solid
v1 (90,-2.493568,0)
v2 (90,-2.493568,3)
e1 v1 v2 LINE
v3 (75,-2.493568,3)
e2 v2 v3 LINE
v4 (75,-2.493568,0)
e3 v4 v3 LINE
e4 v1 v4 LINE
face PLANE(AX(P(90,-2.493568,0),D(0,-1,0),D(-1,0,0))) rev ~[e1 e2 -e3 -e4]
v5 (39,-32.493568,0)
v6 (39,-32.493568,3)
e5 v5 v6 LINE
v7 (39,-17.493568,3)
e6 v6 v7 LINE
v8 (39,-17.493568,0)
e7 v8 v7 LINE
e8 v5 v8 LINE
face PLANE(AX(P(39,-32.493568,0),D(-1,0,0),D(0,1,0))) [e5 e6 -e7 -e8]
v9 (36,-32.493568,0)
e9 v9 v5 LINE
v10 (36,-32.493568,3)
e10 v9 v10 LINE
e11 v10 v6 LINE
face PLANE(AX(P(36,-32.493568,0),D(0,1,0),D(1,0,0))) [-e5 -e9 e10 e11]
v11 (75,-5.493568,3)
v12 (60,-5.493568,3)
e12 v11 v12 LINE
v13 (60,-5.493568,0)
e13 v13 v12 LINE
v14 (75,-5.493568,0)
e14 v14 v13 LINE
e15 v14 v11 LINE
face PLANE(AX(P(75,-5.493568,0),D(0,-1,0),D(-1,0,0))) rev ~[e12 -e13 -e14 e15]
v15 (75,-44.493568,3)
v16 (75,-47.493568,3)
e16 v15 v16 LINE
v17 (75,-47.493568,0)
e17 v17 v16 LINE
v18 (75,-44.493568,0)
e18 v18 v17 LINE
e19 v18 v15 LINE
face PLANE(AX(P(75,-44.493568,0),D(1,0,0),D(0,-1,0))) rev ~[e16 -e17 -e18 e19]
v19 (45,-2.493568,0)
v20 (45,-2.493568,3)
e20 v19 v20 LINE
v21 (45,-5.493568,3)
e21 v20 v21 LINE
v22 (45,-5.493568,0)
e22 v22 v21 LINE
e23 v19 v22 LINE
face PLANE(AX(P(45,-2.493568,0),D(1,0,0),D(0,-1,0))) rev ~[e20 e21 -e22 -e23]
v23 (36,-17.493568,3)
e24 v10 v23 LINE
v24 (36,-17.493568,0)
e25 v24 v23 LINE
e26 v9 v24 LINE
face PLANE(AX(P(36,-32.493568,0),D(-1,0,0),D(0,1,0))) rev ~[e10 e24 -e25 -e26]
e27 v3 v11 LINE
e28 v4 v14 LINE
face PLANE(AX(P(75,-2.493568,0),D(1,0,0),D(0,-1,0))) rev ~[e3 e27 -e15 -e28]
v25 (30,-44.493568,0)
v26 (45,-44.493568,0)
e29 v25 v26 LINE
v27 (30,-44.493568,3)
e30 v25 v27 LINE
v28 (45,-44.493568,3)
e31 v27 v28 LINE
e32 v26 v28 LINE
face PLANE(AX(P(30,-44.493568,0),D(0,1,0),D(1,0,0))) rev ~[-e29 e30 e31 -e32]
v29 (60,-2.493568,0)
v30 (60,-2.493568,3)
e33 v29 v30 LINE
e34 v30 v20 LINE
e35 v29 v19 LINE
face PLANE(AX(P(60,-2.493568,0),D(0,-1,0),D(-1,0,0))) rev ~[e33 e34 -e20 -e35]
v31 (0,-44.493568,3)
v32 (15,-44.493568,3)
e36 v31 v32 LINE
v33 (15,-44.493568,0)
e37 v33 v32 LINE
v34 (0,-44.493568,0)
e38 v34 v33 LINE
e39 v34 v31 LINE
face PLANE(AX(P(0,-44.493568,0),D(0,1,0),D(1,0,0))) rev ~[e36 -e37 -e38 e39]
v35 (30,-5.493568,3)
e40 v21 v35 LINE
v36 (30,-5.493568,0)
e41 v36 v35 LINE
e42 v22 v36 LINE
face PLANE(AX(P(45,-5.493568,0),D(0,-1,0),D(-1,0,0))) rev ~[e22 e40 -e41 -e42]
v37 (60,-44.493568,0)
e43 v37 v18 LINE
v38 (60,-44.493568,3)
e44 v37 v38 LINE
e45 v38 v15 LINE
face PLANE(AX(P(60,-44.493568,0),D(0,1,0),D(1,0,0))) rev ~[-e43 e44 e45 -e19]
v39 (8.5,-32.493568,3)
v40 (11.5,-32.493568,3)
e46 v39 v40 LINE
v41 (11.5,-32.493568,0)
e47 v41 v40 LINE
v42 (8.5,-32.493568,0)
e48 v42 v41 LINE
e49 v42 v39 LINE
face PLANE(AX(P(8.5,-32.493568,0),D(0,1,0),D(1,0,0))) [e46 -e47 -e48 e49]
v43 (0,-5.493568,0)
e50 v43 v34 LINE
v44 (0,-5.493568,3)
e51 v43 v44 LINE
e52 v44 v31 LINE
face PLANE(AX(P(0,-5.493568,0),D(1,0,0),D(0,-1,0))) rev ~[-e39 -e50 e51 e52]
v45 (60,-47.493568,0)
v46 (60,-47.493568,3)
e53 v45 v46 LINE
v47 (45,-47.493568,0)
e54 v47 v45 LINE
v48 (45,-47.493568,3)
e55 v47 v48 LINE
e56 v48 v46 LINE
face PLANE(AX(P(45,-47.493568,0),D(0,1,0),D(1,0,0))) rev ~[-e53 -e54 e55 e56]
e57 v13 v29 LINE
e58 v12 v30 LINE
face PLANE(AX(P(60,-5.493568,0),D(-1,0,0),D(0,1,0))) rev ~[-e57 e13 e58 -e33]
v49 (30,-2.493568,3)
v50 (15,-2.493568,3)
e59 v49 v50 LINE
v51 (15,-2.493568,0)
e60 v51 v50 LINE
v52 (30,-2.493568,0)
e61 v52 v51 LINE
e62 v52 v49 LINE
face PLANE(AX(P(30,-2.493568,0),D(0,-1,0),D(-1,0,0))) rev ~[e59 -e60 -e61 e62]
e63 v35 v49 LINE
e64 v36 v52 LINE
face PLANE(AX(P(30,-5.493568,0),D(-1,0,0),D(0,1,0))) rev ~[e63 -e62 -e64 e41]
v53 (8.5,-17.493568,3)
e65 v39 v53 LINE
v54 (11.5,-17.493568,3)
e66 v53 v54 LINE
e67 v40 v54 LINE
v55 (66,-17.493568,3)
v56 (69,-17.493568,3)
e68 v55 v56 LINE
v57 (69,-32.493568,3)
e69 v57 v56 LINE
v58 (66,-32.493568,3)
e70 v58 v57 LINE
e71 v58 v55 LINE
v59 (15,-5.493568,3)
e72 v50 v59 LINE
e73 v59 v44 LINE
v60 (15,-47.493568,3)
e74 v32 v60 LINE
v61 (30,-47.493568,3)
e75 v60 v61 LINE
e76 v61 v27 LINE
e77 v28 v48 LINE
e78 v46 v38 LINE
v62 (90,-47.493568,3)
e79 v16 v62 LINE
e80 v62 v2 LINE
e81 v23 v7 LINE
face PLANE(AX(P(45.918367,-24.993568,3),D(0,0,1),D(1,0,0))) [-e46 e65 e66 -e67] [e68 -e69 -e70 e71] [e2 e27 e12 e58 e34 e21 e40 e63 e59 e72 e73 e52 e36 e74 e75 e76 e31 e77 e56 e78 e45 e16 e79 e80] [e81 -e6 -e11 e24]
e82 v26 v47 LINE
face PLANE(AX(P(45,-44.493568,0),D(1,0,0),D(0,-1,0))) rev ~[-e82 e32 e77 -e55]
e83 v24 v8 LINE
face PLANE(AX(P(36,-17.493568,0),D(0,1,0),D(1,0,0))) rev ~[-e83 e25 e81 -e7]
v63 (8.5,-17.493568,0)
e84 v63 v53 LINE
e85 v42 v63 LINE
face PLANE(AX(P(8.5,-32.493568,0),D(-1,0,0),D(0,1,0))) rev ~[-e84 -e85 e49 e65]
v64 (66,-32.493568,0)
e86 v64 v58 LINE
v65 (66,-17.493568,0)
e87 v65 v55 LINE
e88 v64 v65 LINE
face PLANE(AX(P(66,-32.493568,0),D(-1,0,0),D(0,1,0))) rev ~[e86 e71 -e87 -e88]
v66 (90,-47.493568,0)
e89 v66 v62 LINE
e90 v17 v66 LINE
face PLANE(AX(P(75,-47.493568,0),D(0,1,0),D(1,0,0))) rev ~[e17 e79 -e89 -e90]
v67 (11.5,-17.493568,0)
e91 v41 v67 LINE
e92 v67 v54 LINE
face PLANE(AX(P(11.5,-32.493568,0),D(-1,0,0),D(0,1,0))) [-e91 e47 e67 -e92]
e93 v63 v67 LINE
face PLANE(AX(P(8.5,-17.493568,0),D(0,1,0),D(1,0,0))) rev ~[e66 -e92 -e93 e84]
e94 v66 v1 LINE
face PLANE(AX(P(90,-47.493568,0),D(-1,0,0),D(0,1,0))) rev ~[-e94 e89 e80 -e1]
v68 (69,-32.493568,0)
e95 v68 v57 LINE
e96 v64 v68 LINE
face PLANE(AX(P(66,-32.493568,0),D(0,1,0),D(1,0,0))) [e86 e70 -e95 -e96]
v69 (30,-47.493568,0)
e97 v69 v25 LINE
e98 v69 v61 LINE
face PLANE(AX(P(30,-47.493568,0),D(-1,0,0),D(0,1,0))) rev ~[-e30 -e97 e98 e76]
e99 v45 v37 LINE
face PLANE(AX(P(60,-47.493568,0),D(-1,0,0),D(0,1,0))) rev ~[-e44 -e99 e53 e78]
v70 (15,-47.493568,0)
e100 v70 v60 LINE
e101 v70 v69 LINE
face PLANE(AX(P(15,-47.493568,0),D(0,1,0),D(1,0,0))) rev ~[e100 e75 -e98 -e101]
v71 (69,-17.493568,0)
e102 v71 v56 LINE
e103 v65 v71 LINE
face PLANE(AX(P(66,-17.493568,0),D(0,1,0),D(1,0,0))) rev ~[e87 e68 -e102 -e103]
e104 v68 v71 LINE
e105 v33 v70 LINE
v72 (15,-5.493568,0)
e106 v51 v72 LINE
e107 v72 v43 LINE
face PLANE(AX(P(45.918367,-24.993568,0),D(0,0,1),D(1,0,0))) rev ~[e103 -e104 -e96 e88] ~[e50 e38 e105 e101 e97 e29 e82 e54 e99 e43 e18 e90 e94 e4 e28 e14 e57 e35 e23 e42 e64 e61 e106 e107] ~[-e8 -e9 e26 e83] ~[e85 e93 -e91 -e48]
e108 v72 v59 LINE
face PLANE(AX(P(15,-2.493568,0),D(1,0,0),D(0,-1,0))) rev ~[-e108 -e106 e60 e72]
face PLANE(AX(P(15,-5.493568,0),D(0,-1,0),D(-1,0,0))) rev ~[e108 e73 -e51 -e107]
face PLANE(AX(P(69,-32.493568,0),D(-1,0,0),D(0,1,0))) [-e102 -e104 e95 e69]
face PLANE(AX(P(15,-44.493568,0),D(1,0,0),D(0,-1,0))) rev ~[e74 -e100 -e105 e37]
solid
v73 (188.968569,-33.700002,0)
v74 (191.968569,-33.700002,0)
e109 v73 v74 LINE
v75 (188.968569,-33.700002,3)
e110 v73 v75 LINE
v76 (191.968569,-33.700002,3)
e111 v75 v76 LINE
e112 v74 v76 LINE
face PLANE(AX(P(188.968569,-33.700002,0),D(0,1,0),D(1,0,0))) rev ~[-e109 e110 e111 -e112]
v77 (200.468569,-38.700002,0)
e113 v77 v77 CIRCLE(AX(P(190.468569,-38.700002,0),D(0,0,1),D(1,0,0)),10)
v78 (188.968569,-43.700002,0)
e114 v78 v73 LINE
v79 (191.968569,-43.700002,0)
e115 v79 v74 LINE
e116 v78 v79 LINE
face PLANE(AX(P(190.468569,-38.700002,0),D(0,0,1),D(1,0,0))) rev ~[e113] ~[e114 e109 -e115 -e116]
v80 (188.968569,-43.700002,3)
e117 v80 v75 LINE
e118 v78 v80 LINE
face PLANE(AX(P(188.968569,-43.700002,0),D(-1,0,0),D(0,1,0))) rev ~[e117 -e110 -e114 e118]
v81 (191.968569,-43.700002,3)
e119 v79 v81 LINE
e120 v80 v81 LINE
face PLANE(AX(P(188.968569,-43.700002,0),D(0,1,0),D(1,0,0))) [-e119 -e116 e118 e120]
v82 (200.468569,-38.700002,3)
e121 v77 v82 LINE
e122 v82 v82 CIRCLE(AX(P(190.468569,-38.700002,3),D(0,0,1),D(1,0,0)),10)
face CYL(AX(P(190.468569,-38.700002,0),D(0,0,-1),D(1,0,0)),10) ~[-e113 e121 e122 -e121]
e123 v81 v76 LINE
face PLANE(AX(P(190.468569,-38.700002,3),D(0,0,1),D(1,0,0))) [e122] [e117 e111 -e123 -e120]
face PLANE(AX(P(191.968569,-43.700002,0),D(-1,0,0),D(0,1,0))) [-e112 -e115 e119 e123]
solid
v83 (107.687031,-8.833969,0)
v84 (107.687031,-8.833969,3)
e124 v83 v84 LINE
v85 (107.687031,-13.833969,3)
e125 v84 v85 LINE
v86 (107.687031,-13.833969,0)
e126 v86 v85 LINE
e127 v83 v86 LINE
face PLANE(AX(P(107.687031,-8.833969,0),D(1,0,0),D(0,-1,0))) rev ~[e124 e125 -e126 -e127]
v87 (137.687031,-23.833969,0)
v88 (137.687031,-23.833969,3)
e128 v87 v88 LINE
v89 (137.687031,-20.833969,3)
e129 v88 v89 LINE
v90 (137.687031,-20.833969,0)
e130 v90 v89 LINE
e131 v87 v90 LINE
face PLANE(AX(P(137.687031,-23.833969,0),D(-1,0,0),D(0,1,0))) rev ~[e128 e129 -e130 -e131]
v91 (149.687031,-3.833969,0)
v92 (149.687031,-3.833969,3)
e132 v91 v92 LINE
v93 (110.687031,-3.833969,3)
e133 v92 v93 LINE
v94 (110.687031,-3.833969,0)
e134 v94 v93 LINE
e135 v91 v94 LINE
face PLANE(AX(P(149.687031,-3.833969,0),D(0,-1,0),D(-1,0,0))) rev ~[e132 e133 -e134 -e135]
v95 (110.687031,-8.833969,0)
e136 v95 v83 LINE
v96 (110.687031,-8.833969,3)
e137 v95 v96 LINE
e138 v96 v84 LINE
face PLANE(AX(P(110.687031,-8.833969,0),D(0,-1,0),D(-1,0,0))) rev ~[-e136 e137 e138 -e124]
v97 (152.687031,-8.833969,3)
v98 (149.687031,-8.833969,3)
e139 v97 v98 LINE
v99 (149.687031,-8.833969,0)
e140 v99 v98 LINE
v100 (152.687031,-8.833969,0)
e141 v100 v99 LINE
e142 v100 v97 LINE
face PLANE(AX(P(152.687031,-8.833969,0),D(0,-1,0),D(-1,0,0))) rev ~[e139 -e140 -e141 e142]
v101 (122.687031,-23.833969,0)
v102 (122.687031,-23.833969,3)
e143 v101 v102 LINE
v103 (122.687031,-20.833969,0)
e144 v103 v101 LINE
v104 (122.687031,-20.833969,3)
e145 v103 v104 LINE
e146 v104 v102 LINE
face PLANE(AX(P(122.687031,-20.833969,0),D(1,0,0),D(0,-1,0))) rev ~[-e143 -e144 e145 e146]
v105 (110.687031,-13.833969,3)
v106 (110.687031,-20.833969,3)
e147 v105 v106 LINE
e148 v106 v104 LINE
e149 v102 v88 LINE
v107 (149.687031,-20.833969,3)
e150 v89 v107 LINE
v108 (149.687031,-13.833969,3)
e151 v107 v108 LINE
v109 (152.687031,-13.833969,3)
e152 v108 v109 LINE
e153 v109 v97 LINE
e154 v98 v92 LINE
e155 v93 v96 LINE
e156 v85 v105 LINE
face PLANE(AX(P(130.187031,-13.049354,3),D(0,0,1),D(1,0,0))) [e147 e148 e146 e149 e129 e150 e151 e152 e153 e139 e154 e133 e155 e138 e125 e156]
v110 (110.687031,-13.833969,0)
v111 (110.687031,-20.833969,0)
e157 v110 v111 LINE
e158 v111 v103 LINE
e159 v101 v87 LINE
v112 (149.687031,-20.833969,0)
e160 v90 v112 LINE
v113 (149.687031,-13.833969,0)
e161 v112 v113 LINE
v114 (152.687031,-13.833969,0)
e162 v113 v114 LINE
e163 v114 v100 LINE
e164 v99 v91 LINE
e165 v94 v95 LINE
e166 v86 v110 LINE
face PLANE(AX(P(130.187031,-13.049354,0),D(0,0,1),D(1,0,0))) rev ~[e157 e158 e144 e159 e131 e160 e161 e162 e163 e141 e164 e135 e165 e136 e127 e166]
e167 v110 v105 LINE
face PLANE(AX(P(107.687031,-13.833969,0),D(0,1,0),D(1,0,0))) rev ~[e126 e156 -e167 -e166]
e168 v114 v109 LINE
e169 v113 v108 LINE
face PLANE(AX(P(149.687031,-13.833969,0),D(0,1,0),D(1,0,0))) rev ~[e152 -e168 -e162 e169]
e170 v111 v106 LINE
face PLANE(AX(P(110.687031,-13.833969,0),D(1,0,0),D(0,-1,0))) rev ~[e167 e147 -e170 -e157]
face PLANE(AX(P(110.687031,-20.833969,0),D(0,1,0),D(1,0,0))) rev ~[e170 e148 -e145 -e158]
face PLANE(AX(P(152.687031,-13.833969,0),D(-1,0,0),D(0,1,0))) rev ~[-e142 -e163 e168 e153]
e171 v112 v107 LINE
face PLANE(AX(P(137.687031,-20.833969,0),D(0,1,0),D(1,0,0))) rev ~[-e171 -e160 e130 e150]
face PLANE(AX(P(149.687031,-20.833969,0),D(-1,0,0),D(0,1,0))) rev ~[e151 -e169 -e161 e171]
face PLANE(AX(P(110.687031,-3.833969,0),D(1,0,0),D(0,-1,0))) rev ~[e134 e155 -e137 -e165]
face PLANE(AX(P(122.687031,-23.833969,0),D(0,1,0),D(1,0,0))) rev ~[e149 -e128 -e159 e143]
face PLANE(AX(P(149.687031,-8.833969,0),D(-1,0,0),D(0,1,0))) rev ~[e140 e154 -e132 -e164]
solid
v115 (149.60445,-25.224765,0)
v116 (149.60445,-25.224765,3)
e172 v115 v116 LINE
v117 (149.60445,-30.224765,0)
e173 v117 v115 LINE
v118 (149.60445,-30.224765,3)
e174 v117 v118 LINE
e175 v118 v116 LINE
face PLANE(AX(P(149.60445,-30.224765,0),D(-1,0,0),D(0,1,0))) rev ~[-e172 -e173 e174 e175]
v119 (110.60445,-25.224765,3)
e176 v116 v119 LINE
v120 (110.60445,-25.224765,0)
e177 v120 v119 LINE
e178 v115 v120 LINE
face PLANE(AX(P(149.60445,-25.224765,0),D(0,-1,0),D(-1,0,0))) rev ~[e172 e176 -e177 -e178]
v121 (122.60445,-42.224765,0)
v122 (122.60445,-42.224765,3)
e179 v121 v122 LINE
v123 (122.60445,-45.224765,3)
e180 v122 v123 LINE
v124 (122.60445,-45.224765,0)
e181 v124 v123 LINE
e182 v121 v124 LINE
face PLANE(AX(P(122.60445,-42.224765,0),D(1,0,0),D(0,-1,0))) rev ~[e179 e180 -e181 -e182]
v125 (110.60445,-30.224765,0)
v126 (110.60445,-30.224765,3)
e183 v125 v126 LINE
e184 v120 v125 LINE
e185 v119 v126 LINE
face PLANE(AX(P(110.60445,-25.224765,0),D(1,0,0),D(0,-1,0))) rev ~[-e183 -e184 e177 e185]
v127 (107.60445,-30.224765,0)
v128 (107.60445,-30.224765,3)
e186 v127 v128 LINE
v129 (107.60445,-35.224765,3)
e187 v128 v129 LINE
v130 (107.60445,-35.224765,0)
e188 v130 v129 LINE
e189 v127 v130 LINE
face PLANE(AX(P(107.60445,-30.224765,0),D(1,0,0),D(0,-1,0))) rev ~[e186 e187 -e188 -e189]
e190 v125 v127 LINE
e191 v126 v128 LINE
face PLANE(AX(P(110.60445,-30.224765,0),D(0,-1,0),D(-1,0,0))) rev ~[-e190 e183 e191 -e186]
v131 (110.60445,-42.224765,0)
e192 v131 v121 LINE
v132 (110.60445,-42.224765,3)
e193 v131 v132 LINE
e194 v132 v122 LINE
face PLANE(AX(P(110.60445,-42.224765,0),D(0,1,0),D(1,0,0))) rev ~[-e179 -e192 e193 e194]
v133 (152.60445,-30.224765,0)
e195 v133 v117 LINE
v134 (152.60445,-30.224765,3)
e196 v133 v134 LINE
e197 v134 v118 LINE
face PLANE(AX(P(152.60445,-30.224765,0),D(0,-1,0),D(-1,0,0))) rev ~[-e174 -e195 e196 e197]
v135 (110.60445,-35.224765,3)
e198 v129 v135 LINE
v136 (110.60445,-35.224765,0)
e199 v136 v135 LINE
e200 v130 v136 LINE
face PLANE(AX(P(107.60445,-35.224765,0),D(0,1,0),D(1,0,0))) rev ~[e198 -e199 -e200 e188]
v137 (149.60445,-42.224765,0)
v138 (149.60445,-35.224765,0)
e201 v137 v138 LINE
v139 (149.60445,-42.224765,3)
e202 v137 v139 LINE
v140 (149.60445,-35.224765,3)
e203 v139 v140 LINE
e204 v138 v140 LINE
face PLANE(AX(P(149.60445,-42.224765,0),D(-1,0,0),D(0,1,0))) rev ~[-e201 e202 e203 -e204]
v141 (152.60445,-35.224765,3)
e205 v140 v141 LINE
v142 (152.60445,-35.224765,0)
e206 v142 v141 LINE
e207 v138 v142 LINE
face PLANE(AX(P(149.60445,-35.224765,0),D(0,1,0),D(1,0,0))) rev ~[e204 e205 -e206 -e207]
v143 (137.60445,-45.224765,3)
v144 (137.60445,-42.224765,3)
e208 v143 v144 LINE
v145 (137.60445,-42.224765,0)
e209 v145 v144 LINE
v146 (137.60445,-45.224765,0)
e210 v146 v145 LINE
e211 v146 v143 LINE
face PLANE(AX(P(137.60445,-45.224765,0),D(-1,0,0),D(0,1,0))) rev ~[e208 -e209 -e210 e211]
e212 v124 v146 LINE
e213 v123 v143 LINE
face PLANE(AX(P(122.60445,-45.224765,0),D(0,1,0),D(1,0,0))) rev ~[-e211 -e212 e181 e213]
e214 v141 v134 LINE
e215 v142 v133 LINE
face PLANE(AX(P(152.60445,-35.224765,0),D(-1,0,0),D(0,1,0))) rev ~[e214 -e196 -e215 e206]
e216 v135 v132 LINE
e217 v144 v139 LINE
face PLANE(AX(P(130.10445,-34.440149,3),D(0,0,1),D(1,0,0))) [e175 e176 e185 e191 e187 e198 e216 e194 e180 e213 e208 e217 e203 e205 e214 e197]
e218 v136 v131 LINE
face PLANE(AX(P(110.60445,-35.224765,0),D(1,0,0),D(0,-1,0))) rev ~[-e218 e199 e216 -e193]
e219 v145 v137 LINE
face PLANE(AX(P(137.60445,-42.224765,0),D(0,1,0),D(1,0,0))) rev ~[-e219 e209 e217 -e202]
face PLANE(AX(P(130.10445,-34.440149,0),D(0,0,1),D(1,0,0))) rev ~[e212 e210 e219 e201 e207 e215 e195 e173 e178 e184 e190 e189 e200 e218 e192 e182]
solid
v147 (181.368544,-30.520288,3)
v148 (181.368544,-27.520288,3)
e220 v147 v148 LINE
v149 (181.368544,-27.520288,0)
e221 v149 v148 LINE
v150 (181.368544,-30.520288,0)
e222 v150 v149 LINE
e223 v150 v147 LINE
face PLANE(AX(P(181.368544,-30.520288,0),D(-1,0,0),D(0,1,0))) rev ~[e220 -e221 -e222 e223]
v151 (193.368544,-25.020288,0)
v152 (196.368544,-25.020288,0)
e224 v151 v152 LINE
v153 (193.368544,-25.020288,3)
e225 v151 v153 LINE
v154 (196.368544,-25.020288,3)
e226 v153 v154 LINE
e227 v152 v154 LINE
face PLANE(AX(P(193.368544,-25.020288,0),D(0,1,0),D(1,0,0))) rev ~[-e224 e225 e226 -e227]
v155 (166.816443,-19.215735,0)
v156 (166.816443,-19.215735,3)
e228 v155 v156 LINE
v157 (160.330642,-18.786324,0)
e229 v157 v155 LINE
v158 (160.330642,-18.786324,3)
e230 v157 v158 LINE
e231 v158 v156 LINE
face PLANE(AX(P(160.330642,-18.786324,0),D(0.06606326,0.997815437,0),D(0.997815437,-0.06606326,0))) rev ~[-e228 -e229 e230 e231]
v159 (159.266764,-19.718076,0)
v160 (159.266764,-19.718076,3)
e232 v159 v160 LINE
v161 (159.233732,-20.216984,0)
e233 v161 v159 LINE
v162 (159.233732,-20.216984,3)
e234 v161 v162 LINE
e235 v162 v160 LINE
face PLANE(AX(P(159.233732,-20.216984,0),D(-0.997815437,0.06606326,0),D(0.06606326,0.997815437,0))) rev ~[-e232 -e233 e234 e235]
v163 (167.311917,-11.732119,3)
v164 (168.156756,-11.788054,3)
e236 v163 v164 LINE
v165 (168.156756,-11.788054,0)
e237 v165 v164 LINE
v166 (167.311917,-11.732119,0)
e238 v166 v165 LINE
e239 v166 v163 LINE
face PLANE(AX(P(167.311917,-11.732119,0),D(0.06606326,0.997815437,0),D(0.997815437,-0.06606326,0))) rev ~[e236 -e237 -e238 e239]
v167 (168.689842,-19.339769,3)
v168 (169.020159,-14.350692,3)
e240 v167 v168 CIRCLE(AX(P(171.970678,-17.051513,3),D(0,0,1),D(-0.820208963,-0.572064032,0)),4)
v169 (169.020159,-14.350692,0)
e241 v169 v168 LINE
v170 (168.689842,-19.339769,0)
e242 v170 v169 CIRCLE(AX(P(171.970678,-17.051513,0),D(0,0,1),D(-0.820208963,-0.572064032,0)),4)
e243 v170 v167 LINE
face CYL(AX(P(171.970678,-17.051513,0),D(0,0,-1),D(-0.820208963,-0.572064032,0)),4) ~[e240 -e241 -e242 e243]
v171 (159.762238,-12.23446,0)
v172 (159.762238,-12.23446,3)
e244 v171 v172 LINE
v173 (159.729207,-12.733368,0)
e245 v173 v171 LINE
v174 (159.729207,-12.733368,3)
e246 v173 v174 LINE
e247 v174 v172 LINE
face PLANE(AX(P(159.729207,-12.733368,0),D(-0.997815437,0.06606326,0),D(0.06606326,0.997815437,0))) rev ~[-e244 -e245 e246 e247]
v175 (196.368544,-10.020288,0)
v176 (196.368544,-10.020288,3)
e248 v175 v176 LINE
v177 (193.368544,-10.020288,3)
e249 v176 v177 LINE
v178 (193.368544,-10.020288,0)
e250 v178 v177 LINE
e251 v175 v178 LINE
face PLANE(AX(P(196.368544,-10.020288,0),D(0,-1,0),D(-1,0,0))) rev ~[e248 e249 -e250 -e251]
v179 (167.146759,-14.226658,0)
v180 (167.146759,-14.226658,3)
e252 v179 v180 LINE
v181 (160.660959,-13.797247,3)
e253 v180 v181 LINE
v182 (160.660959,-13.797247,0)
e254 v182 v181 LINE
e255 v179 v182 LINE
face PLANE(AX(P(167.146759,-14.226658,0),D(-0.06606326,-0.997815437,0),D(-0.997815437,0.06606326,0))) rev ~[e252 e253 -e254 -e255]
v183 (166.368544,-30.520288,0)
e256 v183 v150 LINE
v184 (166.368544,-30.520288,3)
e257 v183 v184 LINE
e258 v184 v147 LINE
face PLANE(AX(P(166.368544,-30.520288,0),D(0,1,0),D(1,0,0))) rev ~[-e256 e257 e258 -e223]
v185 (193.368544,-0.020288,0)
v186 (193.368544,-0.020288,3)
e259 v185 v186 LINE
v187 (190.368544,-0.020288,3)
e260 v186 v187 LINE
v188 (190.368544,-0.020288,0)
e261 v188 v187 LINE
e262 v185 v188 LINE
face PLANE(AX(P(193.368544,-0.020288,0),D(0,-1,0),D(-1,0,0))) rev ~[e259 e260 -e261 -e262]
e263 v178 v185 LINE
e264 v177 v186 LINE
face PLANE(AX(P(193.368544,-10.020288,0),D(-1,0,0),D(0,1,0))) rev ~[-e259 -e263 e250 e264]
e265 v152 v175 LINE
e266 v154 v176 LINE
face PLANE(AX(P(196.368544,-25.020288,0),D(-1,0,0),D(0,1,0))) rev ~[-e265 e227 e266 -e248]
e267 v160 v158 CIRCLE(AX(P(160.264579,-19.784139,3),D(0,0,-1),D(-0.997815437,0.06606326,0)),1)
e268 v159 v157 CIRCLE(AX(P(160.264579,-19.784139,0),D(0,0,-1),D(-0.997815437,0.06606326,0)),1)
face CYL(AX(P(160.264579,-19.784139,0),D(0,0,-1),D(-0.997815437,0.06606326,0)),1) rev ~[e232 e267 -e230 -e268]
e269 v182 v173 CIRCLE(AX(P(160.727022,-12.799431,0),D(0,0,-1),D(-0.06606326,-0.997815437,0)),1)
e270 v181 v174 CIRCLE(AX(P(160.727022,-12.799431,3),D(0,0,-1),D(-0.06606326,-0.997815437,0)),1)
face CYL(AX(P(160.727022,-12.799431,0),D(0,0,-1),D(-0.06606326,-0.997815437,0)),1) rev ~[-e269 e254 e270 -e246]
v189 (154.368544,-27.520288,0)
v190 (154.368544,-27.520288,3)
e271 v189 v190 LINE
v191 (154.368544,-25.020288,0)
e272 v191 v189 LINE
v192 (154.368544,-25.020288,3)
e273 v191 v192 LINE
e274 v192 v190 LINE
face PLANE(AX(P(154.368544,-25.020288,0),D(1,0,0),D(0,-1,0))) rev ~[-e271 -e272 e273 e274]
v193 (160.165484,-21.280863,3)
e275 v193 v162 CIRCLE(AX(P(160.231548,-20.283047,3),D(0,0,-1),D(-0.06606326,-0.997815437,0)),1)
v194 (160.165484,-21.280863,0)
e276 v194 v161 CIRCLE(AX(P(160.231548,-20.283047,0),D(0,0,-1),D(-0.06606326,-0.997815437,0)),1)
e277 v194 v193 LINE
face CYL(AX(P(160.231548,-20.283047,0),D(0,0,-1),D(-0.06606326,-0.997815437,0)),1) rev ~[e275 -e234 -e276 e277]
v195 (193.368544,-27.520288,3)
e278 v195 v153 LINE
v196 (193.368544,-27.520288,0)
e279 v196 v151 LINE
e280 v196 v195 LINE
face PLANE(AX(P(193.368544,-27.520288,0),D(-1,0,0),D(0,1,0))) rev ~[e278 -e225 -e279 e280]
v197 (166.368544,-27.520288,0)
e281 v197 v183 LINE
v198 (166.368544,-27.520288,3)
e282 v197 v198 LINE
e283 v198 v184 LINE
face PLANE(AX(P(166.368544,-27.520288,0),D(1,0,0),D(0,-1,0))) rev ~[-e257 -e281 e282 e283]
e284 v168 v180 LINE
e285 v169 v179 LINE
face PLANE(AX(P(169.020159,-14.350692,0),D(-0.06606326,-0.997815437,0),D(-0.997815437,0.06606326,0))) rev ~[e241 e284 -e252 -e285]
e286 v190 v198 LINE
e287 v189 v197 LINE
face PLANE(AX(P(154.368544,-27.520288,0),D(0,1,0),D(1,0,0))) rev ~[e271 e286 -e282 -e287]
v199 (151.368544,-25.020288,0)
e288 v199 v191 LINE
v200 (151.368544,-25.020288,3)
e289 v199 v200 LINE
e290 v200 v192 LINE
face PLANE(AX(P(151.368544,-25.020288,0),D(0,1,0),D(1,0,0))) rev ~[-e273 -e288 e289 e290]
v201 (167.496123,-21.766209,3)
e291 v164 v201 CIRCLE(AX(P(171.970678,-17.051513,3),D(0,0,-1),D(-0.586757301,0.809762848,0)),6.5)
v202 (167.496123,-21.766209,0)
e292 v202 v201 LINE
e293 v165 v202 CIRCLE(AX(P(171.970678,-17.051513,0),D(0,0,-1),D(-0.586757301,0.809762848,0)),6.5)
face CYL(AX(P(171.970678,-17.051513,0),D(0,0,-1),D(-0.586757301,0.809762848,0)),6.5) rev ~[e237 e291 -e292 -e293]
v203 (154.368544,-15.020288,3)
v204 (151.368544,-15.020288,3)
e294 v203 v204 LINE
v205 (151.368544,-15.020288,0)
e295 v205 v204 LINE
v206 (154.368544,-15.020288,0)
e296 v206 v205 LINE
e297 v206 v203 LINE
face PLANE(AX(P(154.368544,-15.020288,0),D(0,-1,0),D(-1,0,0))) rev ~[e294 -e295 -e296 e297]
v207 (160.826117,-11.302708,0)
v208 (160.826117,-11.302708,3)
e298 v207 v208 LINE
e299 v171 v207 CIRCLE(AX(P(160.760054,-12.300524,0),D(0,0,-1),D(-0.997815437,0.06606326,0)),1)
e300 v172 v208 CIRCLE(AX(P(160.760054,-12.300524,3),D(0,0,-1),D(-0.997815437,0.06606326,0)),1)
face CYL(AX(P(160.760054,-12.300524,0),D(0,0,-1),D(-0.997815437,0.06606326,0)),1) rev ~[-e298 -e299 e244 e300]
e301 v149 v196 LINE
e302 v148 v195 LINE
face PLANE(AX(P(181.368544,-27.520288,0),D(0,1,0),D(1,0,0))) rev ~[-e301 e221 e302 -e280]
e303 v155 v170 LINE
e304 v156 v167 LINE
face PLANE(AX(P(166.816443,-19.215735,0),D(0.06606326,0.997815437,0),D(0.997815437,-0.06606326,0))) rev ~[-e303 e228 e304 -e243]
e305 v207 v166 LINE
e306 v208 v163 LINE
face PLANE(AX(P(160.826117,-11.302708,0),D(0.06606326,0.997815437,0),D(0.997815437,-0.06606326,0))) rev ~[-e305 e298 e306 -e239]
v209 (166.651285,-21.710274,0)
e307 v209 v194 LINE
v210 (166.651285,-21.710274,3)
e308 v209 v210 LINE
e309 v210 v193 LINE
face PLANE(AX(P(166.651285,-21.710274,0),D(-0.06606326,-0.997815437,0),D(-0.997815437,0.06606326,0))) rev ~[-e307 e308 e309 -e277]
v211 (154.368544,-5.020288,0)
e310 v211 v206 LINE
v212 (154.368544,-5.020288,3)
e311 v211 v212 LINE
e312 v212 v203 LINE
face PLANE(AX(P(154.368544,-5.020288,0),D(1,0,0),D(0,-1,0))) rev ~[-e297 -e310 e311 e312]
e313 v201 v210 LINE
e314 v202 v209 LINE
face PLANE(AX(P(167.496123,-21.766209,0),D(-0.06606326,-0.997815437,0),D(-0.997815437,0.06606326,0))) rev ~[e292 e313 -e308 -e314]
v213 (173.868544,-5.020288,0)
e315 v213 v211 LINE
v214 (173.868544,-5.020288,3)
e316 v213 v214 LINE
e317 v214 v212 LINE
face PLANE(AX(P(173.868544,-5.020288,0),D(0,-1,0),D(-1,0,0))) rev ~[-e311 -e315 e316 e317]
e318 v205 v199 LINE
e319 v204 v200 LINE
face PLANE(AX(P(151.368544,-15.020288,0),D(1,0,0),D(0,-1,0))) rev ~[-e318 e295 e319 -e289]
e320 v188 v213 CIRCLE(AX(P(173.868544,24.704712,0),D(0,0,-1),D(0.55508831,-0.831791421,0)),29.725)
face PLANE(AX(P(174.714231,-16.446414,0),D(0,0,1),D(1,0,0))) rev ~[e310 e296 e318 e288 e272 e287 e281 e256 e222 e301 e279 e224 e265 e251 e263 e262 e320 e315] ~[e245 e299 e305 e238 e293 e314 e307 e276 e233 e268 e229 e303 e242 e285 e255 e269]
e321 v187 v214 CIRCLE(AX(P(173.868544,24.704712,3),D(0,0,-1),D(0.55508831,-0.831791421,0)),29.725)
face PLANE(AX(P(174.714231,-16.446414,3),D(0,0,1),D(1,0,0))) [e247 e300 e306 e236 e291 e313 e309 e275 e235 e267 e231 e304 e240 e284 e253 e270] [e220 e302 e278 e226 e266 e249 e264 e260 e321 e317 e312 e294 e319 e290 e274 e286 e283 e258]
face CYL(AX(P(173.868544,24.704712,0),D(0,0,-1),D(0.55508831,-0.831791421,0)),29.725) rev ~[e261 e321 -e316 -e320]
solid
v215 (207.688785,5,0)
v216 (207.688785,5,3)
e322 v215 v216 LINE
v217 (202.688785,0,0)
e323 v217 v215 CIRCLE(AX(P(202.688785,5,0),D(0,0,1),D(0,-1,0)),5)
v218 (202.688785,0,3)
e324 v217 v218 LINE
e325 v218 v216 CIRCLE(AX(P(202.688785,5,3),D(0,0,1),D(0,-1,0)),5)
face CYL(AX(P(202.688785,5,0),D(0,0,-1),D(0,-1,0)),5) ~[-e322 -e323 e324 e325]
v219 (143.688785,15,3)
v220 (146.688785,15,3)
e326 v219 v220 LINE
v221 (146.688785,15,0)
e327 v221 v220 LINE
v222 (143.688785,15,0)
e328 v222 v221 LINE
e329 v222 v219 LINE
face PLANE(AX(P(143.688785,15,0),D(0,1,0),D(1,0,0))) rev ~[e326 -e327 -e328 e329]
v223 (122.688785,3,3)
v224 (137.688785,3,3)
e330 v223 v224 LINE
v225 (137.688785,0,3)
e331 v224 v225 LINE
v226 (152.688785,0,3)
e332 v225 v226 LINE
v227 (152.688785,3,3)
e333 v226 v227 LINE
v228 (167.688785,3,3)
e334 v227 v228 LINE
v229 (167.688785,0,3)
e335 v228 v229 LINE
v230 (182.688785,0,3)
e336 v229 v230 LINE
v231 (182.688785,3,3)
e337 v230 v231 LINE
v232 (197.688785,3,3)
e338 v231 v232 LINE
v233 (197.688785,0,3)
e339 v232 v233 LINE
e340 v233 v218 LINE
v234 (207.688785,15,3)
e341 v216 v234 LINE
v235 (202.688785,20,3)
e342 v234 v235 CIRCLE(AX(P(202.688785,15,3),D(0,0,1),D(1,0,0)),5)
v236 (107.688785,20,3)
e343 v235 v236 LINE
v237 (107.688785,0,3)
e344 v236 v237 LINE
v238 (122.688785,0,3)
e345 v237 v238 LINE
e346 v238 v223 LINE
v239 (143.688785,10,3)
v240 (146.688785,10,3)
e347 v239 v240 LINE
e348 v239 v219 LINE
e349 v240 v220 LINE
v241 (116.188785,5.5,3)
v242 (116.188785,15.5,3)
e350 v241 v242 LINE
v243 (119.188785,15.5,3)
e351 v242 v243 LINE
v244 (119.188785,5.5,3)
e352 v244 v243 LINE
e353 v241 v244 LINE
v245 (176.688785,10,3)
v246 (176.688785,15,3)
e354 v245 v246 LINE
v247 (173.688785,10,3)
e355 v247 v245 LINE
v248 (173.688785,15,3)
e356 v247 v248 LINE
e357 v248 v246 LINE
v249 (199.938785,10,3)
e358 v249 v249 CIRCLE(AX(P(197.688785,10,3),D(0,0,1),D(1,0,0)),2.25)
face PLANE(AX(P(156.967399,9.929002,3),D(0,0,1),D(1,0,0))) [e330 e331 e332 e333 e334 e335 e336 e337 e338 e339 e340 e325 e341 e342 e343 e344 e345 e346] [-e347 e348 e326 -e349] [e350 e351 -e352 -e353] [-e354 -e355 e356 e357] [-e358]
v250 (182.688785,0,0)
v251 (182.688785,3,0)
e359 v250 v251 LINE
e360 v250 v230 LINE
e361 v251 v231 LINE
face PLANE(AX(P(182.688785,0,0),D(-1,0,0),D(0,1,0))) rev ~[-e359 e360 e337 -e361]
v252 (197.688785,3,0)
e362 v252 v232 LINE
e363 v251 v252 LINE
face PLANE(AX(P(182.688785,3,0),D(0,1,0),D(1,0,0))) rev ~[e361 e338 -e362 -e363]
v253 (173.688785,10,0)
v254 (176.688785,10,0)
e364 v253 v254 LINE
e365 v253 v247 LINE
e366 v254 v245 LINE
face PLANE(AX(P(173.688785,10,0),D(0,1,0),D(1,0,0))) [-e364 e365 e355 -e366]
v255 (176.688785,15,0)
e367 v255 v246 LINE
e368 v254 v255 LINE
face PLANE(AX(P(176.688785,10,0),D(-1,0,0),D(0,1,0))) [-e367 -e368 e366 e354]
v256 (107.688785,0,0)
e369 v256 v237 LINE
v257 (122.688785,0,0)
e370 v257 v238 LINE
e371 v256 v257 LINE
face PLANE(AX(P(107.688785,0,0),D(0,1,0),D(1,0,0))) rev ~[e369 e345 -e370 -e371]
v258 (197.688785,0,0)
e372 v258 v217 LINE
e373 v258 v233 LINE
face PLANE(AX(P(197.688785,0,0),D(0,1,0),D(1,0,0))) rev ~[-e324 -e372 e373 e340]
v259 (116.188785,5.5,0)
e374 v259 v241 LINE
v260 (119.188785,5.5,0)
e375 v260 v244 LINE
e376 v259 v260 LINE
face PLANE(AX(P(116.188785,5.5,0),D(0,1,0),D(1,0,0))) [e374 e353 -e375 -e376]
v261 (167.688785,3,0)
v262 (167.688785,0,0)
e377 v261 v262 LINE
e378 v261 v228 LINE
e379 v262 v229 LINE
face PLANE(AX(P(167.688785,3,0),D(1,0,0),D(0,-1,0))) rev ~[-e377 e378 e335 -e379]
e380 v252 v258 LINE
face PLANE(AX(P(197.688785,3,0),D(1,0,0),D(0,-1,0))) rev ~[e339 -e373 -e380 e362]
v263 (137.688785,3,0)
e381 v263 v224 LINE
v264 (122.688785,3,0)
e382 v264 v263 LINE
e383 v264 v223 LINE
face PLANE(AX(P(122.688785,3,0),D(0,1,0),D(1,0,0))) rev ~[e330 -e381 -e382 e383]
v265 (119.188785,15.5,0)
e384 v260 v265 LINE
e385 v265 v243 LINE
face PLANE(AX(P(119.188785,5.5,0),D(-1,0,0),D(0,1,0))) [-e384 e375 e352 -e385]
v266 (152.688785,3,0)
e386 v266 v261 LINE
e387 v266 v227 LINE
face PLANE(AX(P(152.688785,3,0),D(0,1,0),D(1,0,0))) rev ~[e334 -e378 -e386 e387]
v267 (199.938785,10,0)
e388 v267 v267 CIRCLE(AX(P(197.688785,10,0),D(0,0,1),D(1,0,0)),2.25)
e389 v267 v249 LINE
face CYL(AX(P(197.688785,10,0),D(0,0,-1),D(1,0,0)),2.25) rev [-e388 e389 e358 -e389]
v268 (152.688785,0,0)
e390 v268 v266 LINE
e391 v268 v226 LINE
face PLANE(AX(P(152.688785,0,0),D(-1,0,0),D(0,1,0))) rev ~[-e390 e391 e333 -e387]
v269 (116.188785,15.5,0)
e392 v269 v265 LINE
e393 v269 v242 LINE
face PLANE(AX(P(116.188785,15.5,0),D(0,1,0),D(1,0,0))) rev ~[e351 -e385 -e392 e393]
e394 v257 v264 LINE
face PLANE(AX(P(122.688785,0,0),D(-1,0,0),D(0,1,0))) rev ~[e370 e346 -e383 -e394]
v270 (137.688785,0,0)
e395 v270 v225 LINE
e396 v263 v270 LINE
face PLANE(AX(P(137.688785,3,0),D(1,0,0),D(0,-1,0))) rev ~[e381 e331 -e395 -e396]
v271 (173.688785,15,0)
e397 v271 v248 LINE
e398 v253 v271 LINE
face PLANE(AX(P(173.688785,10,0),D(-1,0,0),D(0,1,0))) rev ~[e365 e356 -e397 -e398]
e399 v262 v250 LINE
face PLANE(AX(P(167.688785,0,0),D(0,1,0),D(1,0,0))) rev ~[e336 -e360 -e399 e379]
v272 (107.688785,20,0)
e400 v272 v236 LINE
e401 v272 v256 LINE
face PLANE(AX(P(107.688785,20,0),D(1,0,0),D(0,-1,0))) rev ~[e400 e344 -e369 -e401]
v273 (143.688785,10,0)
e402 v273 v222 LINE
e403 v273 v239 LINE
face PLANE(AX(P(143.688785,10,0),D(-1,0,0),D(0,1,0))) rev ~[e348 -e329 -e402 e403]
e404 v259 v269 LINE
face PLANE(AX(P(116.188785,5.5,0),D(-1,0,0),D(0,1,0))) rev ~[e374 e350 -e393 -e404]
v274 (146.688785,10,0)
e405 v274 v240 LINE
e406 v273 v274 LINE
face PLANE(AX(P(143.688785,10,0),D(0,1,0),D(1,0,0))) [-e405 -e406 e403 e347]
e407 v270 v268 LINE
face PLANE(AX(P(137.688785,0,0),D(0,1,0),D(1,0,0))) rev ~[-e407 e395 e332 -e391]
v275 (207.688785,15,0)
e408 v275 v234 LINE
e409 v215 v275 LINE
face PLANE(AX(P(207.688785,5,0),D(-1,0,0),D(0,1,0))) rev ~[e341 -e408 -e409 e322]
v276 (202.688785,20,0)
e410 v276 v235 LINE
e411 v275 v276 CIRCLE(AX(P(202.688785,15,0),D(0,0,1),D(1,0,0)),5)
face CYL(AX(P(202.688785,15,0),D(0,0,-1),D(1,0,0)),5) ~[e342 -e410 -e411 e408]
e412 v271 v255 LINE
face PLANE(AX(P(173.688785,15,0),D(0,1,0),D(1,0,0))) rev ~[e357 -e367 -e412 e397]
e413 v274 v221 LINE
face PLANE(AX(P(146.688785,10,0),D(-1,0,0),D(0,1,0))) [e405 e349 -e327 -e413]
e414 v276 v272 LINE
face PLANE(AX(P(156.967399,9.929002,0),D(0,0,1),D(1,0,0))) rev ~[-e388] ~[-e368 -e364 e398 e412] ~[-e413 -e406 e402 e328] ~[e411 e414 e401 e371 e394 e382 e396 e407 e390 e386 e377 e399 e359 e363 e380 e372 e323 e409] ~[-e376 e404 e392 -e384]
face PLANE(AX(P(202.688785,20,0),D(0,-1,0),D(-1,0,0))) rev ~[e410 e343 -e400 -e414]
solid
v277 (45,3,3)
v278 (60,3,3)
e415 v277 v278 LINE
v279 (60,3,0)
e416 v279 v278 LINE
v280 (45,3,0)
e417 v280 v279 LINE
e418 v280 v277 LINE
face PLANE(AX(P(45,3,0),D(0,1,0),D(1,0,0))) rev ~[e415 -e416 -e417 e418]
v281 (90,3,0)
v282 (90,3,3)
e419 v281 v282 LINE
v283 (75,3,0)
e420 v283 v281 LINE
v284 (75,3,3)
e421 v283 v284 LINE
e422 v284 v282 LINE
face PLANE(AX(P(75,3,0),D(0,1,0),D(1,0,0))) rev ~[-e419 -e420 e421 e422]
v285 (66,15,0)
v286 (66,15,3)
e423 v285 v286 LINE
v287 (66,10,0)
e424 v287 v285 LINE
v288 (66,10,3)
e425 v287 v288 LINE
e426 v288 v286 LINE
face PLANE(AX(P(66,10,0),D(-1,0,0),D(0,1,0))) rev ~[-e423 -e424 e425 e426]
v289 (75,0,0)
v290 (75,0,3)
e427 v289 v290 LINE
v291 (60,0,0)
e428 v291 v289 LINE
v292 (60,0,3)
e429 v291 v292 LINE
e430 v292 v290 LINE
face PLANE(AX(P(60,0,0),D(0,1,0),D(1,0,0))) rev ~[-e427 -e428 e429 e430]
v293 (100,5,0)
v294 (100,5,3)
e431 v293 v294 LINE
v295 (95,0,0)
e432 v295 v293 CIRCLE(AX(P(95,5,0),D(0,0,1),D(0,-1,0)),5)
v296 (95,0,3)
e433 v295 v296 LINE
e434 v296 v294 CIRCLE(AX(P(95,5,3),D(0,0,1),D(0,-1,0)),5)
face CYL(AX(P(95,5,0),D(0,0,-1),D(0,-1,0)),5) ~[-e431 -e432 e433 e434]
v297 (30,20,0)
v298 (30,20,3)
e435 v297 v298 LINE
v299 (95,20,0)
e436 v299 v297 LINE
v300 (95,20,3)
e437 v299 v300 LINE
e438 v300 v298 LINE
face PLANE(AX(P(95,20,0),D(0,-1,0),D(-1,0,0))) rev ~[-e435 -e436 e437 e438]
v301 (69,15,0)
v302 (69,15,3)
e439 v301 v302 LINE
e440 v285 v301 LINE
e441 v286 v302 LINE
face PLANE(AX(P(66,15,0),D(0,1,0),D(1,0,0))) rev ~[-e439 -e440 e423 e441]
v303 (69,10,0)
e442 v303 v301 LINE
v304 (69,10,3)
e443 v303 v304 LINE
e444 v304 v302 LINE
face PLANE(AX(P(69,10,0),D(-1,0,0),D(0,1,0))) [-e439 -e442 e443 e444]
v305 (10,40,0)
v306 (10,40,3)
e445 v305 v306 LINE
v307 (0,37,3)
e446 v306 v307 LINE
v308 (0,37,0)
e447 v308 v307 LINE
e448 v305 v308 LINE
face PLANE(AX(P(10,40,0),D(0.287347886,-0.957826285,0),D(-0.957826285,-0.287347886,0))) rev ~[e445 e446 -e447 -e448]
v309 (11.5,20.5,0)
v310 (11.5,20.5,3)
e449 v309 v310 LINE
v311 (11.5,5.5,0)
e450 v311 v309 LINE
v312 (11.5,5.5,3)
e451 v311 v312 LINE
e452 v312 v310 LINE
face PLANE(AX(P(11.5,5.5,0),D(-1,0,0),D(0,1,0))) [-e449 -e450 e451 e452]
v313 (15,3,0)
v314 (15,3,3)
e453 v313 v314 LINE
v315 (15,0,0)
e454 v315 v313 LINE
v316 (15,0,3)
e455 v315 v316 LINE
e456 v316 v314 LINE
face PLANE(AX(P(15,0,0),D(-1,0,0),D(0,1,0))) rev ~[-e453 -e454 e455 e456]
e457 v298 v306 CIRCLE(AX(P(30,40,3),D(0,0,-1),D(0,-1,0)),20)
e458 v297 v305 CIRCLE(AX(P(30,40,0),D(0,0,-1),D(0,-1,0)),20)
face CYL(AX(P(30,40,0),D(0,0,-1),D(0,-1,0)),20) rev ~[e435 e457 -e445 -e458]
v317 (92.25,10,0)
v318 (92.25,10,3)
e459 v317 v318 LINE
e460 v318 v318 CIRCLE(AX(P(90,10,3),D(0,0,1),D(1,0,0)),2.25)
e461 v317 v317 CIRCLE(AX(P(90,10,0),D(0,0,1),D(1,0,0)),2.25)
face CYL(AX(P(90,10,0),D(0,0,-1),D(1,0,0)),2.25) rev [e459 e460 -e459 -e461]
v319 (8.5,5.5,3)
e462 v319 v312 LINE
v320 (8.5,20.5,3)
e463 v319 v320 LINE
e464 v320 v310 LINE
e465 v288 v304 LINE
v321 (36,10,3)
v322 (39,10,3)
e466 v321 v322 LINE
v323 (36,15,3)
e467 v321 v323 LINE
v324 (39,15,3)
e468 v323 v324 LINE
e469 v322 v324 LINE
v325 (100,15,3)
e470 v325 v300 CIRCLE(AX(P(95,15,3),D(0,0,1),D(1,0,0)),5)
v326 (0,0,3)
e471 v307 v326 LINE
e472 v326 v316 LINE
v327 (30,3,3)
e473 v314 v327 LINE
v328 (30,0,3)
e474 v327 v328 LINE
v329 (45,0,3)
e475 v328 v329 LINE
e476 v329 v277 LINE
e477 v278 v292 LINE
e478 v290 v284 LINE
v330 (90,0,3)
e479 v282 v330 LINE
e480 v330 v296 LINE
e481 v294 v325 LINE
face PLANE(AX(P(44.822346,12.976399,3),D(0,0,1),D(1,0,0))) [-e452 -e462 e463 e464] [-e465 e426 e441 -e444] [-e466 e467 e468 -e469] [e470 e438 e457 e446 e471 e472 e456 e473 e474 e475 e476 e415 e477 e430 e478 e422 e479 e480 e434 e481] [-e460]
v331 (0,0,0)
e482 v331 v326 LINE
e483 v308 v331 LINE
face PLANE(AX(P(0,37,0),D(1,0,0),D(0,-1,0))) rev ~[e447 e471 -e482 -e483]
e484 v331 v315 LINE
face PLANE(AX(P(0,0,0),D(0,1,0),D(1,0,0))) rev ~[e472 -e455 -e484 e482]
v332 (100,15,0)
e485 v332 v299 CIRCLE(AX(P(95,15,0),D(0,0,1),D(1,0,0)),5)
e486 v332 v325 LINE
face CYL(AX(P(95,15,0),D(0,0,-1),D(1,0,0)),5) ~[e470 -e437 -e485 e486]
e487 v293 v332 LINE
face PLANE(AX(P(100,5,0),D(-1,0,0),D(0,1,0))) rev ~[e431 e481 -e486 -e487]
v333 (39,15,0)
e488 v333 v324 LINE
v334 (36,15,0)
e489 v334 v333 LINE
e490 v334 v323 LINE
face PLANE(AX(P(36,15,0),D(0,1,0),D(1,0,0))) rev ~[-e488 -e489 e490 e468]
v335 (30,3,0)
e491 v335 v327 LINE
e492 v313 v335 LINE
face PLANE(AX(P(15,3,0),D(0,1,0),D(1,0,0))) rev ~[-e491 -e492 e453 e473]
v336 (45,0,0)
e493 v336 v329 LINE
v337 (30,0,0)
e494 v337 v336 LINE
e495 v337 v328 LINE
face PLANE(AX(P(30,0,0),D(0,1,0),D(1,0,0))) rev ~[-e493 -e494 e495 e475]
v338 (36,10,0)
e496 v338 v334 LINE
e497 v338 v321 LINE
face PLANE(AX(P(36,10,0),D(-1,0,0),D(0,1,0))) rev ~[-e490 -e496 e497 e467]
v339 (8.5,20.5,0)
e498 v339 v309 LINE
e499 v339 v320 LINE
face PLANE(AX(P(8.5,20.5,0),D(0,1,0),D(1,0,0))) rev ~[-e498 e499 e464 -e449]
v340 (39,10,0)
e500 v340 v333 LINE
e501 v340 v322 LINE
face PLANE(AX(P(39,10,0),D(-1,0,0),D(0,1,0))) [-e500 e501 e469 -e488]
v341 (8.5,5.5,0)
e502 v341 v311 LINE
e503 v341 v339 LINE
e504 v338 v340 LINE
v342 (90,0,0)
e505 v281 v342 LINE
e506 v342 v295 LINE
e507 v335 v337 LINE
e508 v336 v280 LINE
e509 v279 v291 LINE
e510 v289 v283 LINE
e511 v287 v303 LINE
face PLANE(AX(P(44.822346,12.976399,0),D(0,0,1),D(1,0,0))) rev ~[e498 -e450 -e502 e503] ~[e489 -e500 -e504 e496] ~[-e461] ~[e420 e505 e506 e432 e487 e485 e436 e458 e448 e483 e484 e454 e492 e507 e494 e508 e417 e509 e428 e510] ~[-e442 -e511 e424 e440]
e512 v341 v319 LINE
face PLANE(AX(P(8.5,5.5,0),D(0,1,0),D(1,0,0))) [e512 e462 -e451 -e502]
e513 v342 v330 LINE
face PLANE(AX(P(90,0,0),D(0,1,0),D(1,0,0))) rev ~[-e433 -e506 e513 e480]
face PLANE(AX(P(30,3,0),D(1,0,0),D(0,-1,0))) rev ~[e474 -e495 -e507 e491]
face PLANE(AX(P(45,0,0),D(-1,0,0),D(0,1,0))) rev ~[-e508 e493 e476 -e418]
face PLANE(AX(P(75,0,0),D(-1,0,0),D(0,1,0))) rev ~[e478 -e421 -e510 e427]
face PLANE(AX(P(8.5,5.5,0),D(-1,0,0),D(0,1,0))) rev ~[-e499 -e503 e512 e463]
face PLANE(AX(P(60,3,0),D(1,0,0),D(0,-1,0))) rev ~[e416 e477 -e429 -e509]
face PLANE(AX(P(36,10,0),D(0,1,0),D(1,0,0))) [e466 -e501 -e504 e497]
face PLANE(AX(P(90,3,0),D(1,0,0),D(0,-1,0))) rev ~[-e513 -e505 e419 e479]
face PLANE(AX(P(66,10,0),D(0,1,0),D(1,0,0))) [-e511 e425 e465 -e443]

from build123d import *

# Parameters (mm, degrees)
F1_R     = 10
F1_W     = 3
F1_H     = 10
F2_DEPTH = 3
F1_H_2   = 5
F1_R_2   = 2.25
F1_H_3   = 15


# Not quite as in the source:
# - a feature names something its author has since deleted; it is built from what else it names


with BuildPart() as f2:
    # F1 (on Top) → F2 (new body)
    with BuildSketch(Plane.XY):
        with Locations((190.4685690403, -38.7000021338)):
            Circle(F1_R)
        with Locations((190.4685690403, -38.7000021338)):
            Rectangle(F1_W, F1_H, mode=Mode.SUBTRACT)
    extrude(amount=F2_DEPTH)


with BuildPart() as f2b:
    # F1 (on Top) → F2, piece 2 (new body)
    with BuildSketch(Plane.XY):
        with BuildLine():
            Line((154.3685435057, -25.0202883035), (154.3685435057, -27.5202883035))
            Line((154.3685435057, -27.5202883035), (166.3685435057, -27.5202883035))
            Line((166.3685435057, -27.5202883035), (166.3685435057, -30.5202883035))
            Line((166.3685435057, -30.5202883035), (173.8685435057, -30.5202883035))
            Line((173.8685435057, -30.5202883035), (181.3685435057, -30.5202883035))
            Line((181.3685435057, -30.5202883035), (181.3685435057, -27.5202883035))
            Line((181.3685435057, -27.5202883035), (193.3685435057, -27.5202883035))
            Line((193.3685435057, -27.5202883035), (193.3685435057, -25.0202883035))
            Line((193.3685435057, -25.0202883035), (196.3685435057, -25.0202883035))
            Line((196.3685435057, -25.0202883035), (196.3685435057, -10.0202883035))
            Line((196.3685435057, -10.0202883035), (193.3685435057, -10.0202883035))
            Line((193.3685435057, -10.0202883035), (193.3685435057, -0.0202883035))
            Line((193.3685435057, -0.0202883035), (190.3685435057, -0.0202883035))
            ThreePointArc((190.3685435057, -0.0202883035), (182.4890133305, -3.7428387253), (173.8685435057, -5.0202883035))
            Line((173.8685435057, -5.0202883035), (154.3685435057, -5.0202883035))
            Line((154.3685435057, -5.0202883035), (154.3685435057, -15.0202883035))
            Line((154.3685435057, -15.0202883035), (151.3685435057, -15.0202883035))
            Line((151.3685435057, -15.0202883035), (151.3685435057, -25.0202883035))
            Line((151.3685435057, -25.0202883035), (154.3685435057, -25.0202883035))
        make_face()
        with BuildLine():
            Line((169.0201585277, -14.3506918411), (167.1467590467, -14.2266580037))
            Line((167.1467590467, -14.2266580037), (160.6609587085, -13.7972468117))
            ThreePointArc((160.6609587085, -13.7972468117), (159.9747461278, -13.4582796573), (159.7292065321, -12.7333681147))
            Line((159.7292065321, -12.7333681147), (159.7622381623, -12.2344603964))
            ThreePointArc((159.7622381623, -12.2344603964), (160.1012053166, -11.5482478157), (160.8261168592, -11.30270822))
            Line((160.8261168592, -11.30270822), (167.3119171975, -11.7321194121))
            Line((167.3119171975, -11.7321194121), (168.1567556224, -11.7880543864))
            ThreePointArc((168.1567556224, -11.7880543864), (178.4564784175, -17.480924089), (167.4961230192, -21.766208753))
            Line((167.4961230192, -21.766208753), (166.6512845944, -21.7102737787))
            Line((166.6512845944, -21.7102737787), (160.1654842561, -21.2808625866))
            ThreePointArc((160.1654842561, -21.2808625866), (159.4792716754, -20.9418954323), (159.2337320797, -20.2169838897))
            Line((159.2337320797, -20.2169838897), (159.2667637099, -19.7180761713))
            ThreePointArc((159.2667637099, -19.7180761713), (159.6057308643, -19.0318635907), (160.3306424069, -18.786323995))
            Line((160.3306424069, -18.786323995), (166.8164427452, -19.215735187))
            Line((166.8164427452, -19.215735187), (168.6898422261, -19.3397690244))
            ThreePointArc((168.6898422261, -19.3397690244), (175.9619398259, -17.3157659382), (169.0201585277, -14.3506918411))
        make_face(mode=Mode.SUBTRACT)
    extrude(amount=F2_DEPTH)


with BuildPart() as f2c:
    # F1 (on Top) → F2, piece 3 (new body)
    with BuildSketch(Plane.XY):
        with BuildLine():
            Line((107.6887845993, 20), (107.6887845993, 0))
            Line((107.6887845993, 0), (122.6887845993, 0))
            Line((122.6887845993, 0), (122.6887845993, 3))
            Line((122.6887845993, 3), (137.6887845993, 3))
            Line((137.6887845993, 3), (137.6887845993, 0))
            Line((137.6887845993, 0), (152.6887845993, 0))
            Line((152.6887845993, 0), (152.6887845993, 3))
            Line((152.6887845993, 3), (167.6887845993, 3))
            Line((167.6887845993, 3), (167.6887845993, 0))
            Line((167.6887845993, 0), (182.6887845993, 0))
            Line((182.6887845993, 0), (182.6887845993, 3))
            Line((182.6887845993, 3), (197.6887845993, 3))
            Line((197.6887845993, 3), (197.6887845993, 0))
            Line((197.6887845993, 0), (202.6887845993, 0))
            ThreePointArc((202.6887845993, 0), (206.2243185052, 1.4644660941), (207.6887845993, 5))
            Line((207.6887845993, 5), (207.6887845993, 15))
            ThreePointArc((207.6887845993, 15), (206.2243185052, 18.5355339059), (202.6887845993, 20))
            Line((202.6887845993, 20), (137.6887845993, 20))
            Line((137.6887845993, 20), (107.6887845993, 20))
        make_face()
        with Locations((117.6887845993, 10.5)):
            Rectangle(F1_W, F1_H, mode=Mode.SUBTRACT)
        with Locations((145.1887845993, 12.5)):
            Rectangle(F1_W, F1_H_2, mode=Mode.SUBTRACT)
        with Locations((175.1887845993, 12.5)):
            Rectangle(F1_W, F1_H_2, mode=Mode.SUBTRACT)
        with Locations((197.6887845993, 10)):
            Circle(F1_R_2, mode=Mode.SUBTRACT)
    extrude(amount=F2_DEPTH)


with BuildPart() as f2d:
    # F1 (on Top) → F2, piece 4 (new body)
    with BuildSketch(Plane.XY):
        Polygon((15, -5.493568331), (0, -5.493568331), (0, -24.993568331), (0, -44.493568331), (15, -44.493568331), (15, -47.493568331), (30, -47.493568331), (30, -44.493568331), (45, -44.493568331), (45, -47.493568331), (60, -47.493568331), (60, -44.493568331), (75, -44.493568331), (75, -47.493568331), (90, -47.493568331), (90, -44.493568331), (90, -24.993568331), (90, -5.493568331), (90, -2.493568331), (75, -2.493568331), (75, -5.493568331), (60, -5.493568331), (60, -2.493568331), (45, -2.493568331), (45, -5.493568331), (30, -5.493568331), (30, -2.493568331), (15, -2.493568331), align=None)
        with Locations((10, -24.993568331)):
            Rectangle(F1_W, F1_H_3, mode=Mode.SUBTRACT)
        with Locations((37.5, -24.993568331)):
            Rectangle(F1_W, F1_H_3, mode=Mode.SUBTRACT)
        with Locations((67.5, -24.993568331)):
            Rectangle(F1_W, F1_H_3, mode=Mode.SUBTRACT)
    extrude(amount=F2_DEPTH)


with BuildPart() as f2e:
    # F1 (on Top) → F2, piece 5 (new body)
    with BuildSketch(Plane.XY):
        Polygon((130.1870310709, -3.8339694942), (110.6870310709, -3.8339694942), (110.6870310709, -8.8339694942), (107.6870310709, -8.8339694942), (107.6870310709, -13.8339694942), (110.6870310709, -13.8339694942), (110.6870310709, -20.8339694942), (122.6870310709, -20.8339694942), (122.6870310709, -23.8339694942), (130.1870310709, -23.8339694942), (137.6870310709, -23.8339694942), (137.6870310709, -20.8339694942), (149.6870310709, -20.8339694942), (149.6870310709, -13.8339694942), (152.6870310709, -13.8339694942), (152.6870310709, -8.8339694942), (149.6870310709, -8.8339694942), (149.6870310709, -3.8339694942), align=None)
    extrude(amount=F2_DEPTH)


with BuildPart() as f2f:
    # F1 (on Top) → F2, piece 6 (new body)
    with BuildSketch(Plane.XY):
        Polygon((130.1044501066, -25.2247648239), (110.6044501066, -25.2247648239), (110.6044501066, -30.2247648239), (107.6044501066, -30.2247648239), (107.6044501066, -35.2247648239), (110.6044501066, -35.2247648239), (110.6044501066, -42.2247648239), (122.6044501066, -42.2247648239), (122.6044501066, -45.2247648239), (130.1044501066, -45.2247648239), (137.6044501066, -45.2247648239), (137.6044501066, -42.2247648239), (149.6044501066, -42.2247648239), (149.6044501066, -35.2247648239), (152.6044501066, -35.2247648239), (152.6044501066, -30.2247648239), (149.6044501066, -30.2247648239), (149.6044501066, -25.2247648239), align=None)
    extrude(amount=F2_DEPTH)


with BuildPart() as f2g:
    # F1 (on Top) → F2, piece 7 (new body)
    with BuildSketch(Plane.XY):
        with BuildLine():
            ThreePointArc((30, 20), (15.8578643763, 25.8578643763), (10, 40))
            Line((10, 40), (0, 37))
            Line((0, 37), (0, 0))
            Line((0, 0), (15, 0))
            Line((15, 0), (15, 3))
            Line((15, 3), (30, 3))
            Line((30, 3), (30, 0))
            Line((30, 0), (45, 0))
            Line((45, 0), (45, 3))
            Line((45, 3), (60, 3))
            Line((60, 3), (60, 0))
            Line((60, 0), (75, 0))
            Line((75, 0), (75, 3))
            Line((75, 3), (90, 3))
            Line((90, 3), (90, 0))
            Line((90, 0), (95, 0))
            ThreePointArc((95, 0), (98.5355339059, 1.4644660941), (100, 5))
            Line((100, 5), (100, 15))
            ThreePointArc((100, 15), (98.5355339059, 18.5355339059), (95, 20))
            Line((95, 20), (30, 20))
        make_face()
        with Locations((10, 13)):
            Rectangle(F1_W, F1_H_3, mode=Mode.SUBTRACT)
        with Locations((37.5, 12.5)):
            Rectangle(F1_W, F1_H_2, mode=Mode.SUBTRACT)
        with Locations((67.5, 12.5)):
            Rectangle(F1_W, F1_H_2, mode=Mode.SUBTRACT)
        with Locations((90, 10)):
            Circle(F1_R_2, mode=Mode.SUBTRACT)
    extrude(amount=F2_DEPTH)


solid = Compound([f2.part, f2b.part, f2c.part, f2d.part, f2e.part, f2f.part, f2g.part])
